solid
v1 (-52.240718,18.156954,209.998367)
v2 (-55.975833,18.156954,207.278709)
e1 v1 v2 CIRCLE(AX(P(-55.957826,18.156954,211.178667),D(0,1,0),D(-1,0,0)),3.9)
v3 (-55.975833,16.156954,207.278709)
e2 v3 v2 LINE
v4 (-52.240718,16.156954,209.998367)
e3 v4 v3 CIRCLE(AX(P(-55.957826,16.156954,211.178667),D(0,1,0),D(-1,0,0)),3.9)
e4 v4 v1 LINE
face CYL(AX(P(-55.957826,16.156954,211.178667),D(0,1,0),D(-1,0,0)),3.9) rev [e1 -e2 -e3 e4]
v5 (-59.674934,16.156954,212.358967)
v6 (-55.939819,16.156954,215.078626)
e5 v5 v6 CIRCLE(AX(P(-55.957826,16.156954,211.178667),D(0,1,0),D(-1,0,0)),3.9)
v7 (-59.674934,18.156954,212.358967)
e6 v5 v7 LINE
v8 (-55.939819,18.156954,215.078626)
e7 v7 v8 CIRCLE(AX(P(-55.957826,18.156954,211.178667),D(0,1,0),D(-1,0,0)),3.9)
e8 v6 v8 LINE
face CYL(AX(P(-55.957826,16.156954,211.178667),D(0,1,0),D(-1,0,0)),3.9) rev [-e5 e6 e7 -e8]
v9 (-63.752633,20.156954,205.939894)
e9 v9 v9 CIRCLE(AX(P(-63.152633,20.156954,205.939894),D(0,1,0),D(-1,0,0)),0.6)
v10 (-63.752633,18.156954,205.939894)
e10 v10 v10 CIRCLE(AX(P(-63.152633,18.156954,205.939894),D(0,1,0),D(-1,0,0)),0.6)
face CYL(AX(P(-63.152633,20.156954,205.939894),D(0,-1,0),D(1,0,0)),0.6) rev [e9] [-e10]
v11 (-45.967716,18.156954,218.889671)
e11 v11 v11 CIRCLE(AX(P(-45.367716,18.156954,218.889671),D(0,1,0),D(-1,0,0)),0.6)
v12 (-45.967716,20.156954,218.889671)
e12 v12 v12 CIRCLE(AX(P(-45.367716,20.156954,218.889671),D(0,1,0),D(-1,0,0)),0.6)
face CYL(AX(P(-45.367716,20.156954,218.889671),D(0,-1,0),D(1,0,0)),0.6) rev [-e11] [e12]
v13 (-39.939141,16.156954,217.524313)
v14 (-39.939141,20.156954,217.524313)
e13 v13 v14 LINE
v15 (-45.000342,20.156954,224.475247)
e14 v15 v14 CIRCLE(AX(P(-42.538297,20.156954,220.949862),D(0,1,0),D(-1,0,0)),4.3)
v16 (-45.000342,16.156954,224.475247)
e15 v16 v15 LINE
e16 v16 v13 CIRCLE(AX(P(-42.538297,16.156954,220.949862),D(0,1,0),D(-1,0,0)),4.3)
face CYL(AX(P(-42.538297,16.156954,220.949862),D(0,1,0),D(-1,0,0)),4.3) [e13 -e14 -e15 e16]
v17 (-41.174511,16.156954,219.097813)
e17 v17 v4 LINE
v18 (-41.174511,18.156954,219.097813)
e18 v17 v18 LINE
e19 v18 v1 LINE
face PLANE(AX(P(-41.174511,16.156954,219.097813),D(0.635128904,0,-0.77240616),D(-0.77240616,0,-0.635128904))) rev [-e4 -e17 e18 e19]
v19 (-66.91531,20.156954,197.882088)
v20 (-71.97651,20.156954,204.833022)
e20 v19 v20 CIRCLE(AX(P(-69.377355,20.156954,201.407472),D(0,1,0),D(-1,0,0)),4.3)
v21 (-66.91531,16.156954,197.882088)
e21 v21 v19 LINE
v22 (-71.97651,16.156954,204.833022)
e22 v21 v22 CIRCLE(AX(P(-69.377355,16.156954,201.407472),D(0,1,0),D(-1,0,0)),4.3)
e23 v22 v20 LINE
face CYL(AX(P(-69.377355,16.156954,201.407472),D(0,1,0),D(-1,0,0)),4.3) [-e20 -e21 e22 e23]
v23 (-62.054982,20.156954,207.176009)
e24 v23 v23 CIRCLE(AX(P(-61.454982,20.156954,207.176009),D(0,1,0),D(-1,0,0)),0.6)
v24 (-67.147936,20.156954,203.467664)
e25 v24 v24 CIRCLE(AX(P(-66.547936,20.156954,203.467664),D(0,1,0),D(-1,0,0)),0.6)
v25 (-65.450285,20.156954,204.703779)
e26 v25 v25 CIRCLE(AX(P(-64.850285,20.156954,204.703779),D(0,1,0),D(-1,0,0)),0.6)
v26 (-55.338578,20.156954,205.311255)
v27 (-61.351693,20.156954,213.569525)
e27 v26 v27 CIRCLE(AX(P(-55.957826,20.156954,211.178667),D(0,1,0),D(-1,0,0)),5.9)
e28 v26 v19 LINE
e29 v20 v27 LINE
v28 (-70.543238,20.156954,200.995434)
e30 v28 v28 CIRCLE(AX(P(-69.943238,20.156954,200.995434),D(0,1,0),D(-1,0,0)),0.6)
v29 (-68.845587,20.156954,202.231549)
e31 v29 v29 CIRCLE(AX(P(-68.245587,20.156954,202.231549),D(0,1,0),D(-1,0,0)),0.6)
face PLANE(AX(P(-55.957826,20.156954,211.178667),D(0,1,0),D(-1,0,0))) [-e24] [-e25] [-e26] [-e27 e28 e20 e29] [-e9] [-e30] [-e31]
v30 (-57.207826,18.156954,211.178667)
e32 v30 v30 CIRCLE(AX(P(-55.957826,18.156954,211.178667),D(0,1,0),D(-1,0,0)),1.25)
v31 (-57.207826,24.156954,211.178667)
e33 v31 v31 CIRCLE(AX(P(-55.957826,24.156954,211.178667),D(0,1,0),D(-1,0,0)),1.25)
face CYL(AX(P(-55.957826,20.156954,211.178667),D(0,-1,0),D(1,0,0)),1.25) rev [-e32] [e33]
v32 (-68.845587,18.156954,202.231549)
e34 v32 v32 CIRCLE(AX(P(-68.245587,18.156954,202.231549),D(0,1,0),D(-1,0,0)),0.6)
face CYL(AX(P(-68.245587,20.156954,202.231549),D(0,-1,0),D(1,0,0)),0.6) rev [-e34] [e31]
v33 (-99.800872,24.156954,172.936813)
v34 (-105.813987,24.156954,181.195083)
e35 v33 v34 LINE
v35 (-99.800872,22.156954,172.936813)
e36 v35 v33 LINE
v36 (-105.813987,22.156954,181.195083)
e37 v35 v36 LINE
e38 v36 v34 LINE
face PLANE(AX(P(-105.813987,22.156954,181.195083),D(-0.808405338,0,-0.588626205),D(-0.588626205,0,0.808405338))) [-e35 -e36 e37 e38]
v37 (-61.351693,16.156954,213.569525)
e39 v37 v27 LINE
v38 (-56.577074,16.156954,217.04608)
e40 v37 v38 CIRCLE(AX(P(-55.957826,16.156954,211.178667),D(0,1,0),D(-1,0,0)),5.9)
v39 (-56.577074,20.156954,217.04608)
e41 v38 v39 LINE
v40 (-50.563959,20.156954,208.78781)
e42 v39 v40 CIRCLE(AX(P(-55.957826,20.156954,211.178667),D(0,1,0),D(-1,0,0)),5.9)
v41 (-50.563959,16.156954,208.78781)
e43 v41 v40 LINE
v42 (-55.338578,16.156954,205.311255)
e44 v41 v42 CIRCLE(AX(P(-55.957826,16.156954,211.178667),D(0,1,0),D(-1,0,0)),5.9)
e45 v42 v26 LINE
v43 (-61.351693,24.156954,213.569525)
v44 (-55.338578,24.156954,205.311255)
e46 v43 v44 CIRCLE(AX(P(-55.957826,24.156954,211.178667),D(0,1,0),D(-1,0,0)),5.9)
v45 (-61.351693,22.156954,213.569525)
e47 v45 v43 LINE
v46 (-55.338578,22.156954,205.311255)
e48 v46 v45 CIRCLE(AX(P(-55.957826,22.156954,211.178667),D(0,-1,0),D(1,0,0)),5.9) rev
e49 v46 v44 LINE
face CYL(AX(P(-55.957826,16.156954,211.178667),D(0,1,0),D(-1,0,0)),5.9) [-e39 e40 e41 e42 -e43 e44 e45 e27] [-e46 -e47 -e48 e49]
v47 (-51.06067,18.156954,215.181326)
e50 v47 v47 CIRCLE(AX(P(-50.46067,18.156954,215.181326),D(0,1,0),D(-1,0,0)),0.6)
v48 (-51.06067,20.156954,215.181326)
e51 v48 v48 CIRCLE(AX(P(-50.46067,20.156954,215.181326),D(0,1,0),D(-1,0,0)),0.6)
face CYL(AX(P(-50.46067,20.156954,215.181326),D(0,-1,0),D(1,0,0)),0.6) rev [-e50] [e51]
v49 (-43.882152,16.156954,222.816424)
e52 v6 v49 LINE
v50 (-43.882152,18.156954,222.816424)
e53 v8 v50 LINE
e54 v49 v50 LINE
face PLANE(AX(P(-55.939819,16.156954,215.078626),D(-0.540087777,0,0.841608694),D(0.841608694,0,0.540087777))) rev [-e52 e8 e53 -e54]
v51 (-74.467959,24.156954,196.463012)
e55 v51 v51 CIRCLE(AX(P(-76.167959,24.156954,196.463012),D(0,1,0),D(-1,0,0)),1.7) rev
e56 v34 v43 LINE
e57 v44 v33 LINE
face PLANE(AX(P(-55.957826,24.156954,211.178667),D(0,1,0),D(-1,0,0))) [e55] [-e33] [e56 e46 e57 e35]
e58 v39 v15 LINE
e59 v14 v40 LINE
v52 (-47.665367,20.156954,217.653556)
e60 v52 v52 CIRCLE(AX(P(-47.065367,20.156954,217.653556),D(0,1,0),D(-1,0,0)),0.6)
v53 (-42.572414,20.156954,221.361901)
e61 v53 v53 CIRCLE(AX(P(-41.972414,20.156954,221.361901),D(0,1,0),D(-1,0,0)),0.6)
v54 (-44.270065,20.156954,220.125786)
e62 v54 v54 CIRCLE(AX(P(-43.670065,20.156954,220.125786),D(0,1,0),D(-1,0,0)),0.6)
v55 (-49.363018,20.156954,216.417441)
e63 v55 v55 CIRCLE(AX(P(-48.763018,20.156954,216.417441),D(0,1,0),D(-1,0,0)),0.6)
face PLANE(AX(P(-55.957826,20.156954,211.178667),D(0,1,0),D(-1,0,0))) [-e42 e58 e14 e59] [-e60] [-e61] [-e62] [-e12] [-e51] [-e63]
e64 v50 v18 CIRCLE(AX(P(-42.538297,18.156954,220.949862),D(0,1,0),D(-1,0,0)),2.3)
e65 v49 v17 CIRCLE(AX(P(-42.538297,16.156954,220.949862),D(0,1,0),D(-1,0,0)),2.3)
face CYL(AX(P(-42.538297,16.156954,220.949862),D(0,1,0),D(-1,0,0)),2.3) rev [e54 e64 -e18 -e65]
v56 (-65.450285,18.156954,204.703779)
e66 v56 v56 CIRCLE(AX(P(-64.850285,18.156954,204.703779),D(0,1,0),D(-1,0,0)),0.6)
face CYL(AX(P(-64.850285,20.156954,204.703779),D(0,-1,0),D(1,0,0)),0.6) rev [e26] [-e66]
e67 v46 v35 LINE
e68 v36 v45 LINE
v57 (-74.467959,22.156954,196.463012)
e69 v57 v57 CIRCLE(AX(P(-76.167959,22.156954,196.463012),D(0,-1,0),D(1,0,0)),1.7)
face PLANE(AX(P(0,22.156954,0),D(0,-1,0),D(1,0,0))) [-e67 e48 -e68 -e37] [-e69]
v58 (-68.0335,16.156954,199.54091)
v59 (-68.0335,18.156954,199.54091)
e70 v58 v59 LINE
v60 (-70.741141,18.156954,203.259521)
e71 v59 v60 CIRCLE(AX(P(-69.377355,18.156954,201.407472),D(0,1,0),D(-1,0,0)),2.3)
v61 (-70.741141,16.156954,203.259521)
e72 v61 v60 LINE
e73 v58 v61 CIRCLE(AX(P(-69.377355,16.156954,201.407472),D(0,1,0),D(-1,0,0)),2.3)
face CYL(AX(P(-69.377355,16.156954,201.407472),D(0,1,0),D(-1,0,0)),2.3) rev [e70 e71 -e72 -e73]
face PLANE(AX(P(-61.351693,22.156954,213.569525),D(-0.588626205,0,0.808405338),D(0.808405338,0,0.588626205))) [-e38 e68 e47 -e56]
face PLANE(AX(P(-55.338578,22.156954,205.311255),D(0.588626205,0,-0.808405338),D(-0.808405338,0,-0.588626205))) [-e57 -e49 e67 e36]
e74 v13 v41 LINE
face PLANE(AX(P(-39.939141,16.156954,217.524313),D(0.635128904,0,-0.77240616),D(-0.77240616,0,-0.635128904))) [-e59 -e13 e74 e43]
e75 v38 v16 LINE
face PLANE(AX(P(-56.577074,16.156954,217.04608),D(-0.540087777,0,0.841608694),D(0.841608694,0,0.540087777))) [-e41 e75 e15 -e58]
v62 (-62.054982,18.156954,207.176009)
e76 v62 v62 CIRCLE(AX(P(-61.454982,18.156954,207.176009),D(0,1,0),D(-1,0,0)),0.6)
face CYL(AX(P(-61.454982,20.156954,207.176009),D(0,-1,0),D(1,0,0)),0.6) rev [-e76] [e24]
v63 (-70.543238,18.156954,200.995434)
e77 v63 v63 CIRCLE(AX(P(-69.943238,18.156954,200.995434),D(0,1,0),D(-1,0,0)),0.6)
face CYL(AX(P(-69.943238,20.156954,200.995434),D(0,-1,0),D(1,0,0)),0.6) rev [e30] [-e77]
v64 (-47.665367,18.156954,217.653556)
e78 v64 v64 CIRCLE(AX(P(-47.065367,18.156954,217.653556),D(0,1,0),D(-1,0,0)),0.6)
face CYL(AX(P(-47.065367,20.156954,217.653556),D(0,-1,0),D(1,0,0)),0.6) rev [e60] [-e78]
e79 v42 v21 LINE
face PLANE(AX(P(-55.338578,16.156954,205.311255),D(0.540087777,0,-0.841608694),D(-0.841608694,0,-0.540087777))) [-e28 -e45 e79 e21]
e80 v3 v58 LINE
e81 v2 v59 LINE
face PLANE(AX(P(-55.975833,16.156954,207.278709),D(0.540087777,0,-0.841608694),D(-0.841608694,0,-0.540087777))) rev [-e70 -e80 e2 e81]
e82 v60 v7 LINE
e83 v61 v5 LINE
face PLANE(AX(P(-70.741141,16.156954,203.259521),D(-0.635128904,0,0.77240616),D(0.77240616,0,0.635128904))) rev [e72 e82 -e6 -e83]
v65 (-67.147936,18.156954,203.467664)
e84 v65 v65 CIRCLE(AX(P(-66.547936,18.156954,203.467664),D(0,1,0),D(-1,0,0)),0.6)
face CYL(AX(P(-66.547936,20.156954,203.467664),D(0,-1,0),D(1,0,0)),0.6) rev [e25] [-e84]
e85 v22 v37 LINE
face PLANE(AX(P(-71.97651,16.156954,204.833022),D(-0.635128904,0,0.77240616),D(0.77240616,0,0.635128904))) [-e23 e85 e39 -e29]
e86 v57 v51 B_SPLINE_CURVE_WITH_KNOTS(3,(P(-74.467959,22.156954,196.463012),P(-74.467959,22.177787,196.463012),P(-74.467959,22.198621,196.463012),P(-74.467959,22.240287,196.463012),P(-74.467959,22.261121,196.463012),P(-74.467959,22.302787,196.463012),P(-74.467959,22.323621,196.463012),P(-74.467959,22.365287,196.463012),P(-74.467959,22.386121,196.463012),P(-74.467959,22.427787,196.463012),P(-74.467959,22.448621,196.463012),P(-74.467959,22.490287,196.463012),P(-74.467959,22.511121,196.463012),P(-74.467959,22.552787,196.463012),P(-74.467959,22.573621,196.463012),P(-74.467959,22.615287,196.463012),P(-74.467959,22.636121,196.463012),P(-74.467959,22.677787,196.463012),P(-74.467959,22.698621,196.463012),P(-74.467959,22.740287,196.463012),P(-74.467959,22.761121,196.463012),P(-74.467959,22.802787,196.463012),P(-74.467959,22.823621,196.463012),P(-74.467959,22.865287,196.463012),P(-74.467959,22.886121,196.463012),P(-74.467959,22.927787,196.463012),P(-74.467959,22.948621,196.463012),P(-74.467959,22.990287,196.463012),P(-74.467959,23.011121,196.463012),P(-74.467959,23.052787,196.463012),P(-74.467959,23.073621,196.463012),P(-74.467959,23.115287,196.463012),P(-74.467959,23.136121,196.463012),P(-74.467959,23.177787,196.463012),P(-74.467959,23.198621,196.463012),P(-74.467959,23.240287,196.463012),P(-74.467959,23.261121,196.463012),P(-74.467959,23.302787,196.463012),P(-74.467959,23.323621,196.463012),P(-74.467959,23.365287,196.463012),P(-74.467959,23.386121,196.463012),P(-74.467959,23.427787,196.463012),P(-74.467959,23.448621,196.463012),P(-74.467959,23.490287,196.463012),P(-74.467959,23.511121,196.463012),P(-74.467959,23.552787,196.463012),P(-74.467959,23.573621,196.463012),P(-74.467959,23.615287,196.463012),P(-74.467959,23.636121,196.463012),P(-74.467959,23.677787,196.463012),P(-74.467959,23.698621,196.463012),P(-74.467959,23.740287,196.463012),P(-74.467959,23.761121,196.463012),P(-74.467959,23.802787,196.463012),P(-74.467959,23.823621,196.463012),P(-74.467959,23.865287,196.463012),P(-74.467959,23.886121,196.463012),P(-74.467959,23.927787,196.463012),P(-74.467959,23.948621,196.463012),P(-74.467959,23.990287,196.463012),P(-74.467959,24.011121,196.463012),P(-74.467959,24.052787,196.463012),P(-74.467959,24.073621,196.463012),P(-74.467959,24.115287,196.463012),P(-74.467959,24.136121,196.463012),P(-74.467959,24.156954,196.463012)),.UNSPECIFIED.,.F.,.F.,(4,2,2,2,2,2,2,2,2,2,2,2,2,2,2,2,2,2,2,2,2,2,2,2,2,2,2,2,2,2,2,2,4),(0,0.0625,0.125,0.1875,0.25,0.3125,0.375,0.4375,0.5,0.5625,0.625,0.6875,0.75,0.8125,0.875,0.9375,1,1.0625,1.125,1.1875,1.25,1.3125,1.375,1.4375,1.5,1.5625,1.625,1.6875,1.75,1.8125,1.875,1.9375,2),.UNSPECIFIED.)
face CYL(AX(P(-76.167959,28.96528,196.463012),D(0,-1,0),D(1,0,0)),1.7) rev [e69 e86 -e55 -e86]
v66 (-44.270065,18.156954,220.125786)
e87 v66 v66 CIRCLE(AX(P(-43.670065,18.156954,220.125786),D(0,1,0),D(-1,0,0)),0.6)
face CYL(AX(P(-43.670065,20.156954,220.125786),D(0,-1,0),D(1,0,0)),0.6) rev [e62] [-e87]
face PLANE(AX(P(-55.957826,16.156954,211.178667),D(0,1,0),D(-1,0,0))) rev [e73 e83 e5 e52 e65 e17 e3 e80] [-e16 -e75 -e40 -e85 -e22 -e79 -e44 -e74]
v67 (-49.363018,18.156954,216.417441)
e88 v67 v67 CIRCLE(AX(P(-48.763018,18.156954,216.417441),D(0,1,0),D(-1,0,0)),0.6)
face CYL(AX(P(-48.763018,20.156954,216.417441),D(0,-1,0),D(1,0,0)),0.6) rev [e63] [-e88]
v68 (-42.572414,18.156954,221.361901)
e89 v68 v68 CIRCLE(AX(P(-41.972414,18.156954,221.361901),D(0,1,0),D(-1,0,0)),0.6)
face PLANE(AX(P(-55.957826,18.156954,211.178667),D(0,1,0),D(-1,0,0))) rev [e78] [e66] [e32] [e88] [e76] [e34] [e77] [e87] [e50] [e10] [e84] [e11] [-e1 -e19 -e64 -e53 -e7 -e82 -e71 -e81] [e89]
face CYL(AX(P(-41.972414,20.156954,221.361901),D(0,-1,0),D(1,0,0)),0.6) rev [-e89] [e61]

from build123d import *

# Parameters (mm, degrees)
EXTRUDE_START       = -2
EXTRUDE_1_DEPTH     = 2
SKETCH_2_R          = 0.6
SKETCH_2_R_2        = 1.25
EXTRUDE_2_DEPTH     = 2
SKETCH_3_R          = 5.9
SKETCH_3_R_2        = 1.25
EXTRUDE_3_DEPTH     = 4
EXTRUDE_4_DEPTH     = 2
SKETCH_5_R          = 1.7
CUT_EXTRUDE_1_DEPTH = 2


# Read off the part's stored shape, not the designer's step: 填料-伸長1
with BuildPart() as part:
    # 填料-伸長1 outline → 填料-伸長1 (new body)
    with BuildSketch(Plane(origin=(0, 18.156954032, 0), x_dir=(1, 0, 0), z_dir=(0, 1, 0)).offset(EXTRUDE_START)):
        with BuildLine():
            Line((-71.976510321, -204.833021781), (-61.351692907, -213.569524655))
            ThreePointArc((-61.351692907, -213.569524655), (-59.430720516, -215.948258819), (-56.577073779, -217.046080048))
            Line((-56.577073779, -217.046080048), (-45.000342303, -224.475246616))
            ThreePointArc((-45.000342303, -224.475246616), (-39.062154339, -223.48095501), (-39.939141491, -217.524312867))
            Line((-39.939141491, -217.524312867), (-50.563958905, -208.787809993))
            ThreePointArc((-50.563958905, -208.787809993), (-52.484931296, -206.409075829), (-55.338578032, -205.3112546))
            Line((-55.338578032, -205.3112546), (-66.915309509, -197.882088033))
            ThreePointArc((-66.915309509, -197.882088033), (-72.853497472, -198.876379638), (-71.976510321, -204.833021781))
        make_face()
        with BuildLine():
            ThreePointArc((-55.939819286, -215.078625755), (-58.253468106, -214.331448143), (-59.674933886, -212.358967399))
            Line((-59.674933886, -212.358967399), (-70.741141251, -203.259521386))
            ThreePointArc((-70.741141251, -203.259521386), (-71.236686796, -200.053632048), (-68.033499603, -199.540910248))
            Line((-68.033499603, -199.540910248), (-55.975832526, -207.278708893))
            ThreePointArc((-55.975832526, -207.278708893), (-53.662183706, -208.025886506), (-52.240717926, -209.998367249))
            Line((-52.240717926, -209.998367249), (-41.17451056, -219.097813262))
            ThreePointArc((-41.17451056, -219.097813262), (-40.678965016, -222.303702601), (-43.882152209, -222.8164244))
            Line((-43.882152209, -222.8164244), (-55.939819286, -215.078625755))
        make_face(mode=Mode.SUBTRACT)
    extrude(amount=EXTRUDE_1_DEPTH)

    # 草圖2 → 填料-伸長2 (add)
    with BuildSketch(Plane(origin=(0, 18.156954032, 0), x_dir=(1, 0, 0), z_dir=(0, 1, 0))):
        with BuildLine():
            Line((-56.577073779, -217.046080048), (-45.000342303, -224.475246616))
            ThreePointArc((-45.000342303, -224.475246616), (-39.06215434, -223.480955011), (-39.939141491, -217.524312867))
            Line((-39.939141491, -217.524312867), (-50.563958905, -208.787809993))
            ThreePointArc((-50.563958905, -208.787809993), (-52.484931296, -206.409075829), (-55.338578032, -205.3112546))
            Line((-55.338578032, -205.3112546), (-66.915309509, -197.882088033))
            ThreePointArc((-66.915309509, -197.882088033), (-72.853497472, -198.876379638), (-71.976510321, -204.833021781))
            Line((-71.976510321, -204.833021781), (-61.351692907, -213.569524655))
            ThreePointArc((-61.351692907, -213.569524655), (-59.430720516, -215.948258819), (-56.577073779, -217.046080048))
        make_face()
        with Locations(Location((-69.943238255, -200.995433976, 0), (0, 0, 180))):
            Circle(SKETCH_2_R, mode=Mode.SUBTRACT)
        with Locations(Location((-68.245587045, -202.231549007, 0), (0, 0, 180))):
            Circle(SKETCH_2_R, mode=Mode.SUBTRACT)
        with Locations(Location((-66.547935835, -203.467664037, 0), (0, 0, 180))):
            Circle(SKETCH_2_R, mode=Mode.SUBTRACT)
        with Locations(Location((-64.850284625, -204.703779068, 0), (0, 0, 180))):
            Circle(SKETCH_2_R, mode=Mode.SUBTRACT)
        with Locations(Location((-63.152633415, -205.939894099, 0), (0, 0, 180))):
            Circle(SKETCH_2_R, mode=Mode.SUBTRACT)
        with Locations(Location((-61.454982205, -207.176009129, 0), (0, 0, 180))):
            Circle(SKETCH_2_R, mode=Mode.SUBTRACT)
        with Locations(Location((-55.957825906, -211.178667324, 0), (0, 0, 180))):
            Circle(SKETCH_2_R_2, mode=Mode.SUBTRACT)
        with Locations(Location((-50.460669607, -215.181325519, 0), (0, 0, 180))):
            Circle(SKETCH_2_R, mode=Mode.SUBTRACT)
        with Locations(Location((-48.763018397, -216.41744055, 0), (0, 0, 180))):
            Circle(SKETCH_2_R, mode=Mode.SUBTRACT)
        with Locations(Location((-47.065367187, -217.65355558, 0), (0, 0, 180))):
            Circle(SKETCH_2_R, mode=Mode.SUBTRACT)
        with Locations(Location((-45.367715977, -218.889670611, 0), (0, 0, 180))):
            Circle(SKETCH_2_R, mode=Mode.SUBTRACT)
        with Locations(Location((-43.670064767, -220.125785642, 0), (0, 0, 180))):
            Circle(SKETCH_2_R, mode=Mode.SUBTRACT)
        with Locations(Location((-41.972413557, -221.361900672, 0), (0, 0, 180))):
            Circle(SKETCH_2_R, mode=Mode.SUBTRACT)
    extrude(amount=EXTRUDE_2_DEPTH)

    # 草圖3 → 填料-伸長3 (add)
    with BuildSketch(Plane(origin=(0, 20.156954032, 0), x_dir=(1, 0, 0), z_dir=(0, 1, 0))):
        with Locations(Location((-55.957825906, -211.178667324, 0), (0, 0, 180))):
            Circle(SKETCH_3_R)
        with Locations(Location((-55.957825906, -211.178667324, 0), (0, 0, 180))):
            Circle(SKETCH_3_R_2, mode=Mode.SUBTRACT)
    extrude(amount=EXTRUDE_3_DEPTH)

    # 草圖4 → 填料-伸長4 (add)
    with BuildSketch(Plane(origin=(0, 24.156954032, 0), x_dir=(1, 0, 0), z_dir=(0, 1, 0))):
        Polygon((-61.351692907, -213.569524655), (-55.338578032, -205.3112546), (-99.800871628, -172.93681332), (-105.813986502, -181.195083375), align=None)
    extrude(amount=-EXTRUDE_4_DEPTH)

    # 草圖5 → 除料-伸長1 (cut)
    with BuildSketch(Plane.XZ.offset(-22.156954032)):
        with Locations((-76.167959358, 196.463012197)):
            Circle(SKETCH_5_R)
    extrude(amount=-CUT_EXTRUDE_1_DEPTH, mode=Mode.SUBTRACT)


solid = part.part
